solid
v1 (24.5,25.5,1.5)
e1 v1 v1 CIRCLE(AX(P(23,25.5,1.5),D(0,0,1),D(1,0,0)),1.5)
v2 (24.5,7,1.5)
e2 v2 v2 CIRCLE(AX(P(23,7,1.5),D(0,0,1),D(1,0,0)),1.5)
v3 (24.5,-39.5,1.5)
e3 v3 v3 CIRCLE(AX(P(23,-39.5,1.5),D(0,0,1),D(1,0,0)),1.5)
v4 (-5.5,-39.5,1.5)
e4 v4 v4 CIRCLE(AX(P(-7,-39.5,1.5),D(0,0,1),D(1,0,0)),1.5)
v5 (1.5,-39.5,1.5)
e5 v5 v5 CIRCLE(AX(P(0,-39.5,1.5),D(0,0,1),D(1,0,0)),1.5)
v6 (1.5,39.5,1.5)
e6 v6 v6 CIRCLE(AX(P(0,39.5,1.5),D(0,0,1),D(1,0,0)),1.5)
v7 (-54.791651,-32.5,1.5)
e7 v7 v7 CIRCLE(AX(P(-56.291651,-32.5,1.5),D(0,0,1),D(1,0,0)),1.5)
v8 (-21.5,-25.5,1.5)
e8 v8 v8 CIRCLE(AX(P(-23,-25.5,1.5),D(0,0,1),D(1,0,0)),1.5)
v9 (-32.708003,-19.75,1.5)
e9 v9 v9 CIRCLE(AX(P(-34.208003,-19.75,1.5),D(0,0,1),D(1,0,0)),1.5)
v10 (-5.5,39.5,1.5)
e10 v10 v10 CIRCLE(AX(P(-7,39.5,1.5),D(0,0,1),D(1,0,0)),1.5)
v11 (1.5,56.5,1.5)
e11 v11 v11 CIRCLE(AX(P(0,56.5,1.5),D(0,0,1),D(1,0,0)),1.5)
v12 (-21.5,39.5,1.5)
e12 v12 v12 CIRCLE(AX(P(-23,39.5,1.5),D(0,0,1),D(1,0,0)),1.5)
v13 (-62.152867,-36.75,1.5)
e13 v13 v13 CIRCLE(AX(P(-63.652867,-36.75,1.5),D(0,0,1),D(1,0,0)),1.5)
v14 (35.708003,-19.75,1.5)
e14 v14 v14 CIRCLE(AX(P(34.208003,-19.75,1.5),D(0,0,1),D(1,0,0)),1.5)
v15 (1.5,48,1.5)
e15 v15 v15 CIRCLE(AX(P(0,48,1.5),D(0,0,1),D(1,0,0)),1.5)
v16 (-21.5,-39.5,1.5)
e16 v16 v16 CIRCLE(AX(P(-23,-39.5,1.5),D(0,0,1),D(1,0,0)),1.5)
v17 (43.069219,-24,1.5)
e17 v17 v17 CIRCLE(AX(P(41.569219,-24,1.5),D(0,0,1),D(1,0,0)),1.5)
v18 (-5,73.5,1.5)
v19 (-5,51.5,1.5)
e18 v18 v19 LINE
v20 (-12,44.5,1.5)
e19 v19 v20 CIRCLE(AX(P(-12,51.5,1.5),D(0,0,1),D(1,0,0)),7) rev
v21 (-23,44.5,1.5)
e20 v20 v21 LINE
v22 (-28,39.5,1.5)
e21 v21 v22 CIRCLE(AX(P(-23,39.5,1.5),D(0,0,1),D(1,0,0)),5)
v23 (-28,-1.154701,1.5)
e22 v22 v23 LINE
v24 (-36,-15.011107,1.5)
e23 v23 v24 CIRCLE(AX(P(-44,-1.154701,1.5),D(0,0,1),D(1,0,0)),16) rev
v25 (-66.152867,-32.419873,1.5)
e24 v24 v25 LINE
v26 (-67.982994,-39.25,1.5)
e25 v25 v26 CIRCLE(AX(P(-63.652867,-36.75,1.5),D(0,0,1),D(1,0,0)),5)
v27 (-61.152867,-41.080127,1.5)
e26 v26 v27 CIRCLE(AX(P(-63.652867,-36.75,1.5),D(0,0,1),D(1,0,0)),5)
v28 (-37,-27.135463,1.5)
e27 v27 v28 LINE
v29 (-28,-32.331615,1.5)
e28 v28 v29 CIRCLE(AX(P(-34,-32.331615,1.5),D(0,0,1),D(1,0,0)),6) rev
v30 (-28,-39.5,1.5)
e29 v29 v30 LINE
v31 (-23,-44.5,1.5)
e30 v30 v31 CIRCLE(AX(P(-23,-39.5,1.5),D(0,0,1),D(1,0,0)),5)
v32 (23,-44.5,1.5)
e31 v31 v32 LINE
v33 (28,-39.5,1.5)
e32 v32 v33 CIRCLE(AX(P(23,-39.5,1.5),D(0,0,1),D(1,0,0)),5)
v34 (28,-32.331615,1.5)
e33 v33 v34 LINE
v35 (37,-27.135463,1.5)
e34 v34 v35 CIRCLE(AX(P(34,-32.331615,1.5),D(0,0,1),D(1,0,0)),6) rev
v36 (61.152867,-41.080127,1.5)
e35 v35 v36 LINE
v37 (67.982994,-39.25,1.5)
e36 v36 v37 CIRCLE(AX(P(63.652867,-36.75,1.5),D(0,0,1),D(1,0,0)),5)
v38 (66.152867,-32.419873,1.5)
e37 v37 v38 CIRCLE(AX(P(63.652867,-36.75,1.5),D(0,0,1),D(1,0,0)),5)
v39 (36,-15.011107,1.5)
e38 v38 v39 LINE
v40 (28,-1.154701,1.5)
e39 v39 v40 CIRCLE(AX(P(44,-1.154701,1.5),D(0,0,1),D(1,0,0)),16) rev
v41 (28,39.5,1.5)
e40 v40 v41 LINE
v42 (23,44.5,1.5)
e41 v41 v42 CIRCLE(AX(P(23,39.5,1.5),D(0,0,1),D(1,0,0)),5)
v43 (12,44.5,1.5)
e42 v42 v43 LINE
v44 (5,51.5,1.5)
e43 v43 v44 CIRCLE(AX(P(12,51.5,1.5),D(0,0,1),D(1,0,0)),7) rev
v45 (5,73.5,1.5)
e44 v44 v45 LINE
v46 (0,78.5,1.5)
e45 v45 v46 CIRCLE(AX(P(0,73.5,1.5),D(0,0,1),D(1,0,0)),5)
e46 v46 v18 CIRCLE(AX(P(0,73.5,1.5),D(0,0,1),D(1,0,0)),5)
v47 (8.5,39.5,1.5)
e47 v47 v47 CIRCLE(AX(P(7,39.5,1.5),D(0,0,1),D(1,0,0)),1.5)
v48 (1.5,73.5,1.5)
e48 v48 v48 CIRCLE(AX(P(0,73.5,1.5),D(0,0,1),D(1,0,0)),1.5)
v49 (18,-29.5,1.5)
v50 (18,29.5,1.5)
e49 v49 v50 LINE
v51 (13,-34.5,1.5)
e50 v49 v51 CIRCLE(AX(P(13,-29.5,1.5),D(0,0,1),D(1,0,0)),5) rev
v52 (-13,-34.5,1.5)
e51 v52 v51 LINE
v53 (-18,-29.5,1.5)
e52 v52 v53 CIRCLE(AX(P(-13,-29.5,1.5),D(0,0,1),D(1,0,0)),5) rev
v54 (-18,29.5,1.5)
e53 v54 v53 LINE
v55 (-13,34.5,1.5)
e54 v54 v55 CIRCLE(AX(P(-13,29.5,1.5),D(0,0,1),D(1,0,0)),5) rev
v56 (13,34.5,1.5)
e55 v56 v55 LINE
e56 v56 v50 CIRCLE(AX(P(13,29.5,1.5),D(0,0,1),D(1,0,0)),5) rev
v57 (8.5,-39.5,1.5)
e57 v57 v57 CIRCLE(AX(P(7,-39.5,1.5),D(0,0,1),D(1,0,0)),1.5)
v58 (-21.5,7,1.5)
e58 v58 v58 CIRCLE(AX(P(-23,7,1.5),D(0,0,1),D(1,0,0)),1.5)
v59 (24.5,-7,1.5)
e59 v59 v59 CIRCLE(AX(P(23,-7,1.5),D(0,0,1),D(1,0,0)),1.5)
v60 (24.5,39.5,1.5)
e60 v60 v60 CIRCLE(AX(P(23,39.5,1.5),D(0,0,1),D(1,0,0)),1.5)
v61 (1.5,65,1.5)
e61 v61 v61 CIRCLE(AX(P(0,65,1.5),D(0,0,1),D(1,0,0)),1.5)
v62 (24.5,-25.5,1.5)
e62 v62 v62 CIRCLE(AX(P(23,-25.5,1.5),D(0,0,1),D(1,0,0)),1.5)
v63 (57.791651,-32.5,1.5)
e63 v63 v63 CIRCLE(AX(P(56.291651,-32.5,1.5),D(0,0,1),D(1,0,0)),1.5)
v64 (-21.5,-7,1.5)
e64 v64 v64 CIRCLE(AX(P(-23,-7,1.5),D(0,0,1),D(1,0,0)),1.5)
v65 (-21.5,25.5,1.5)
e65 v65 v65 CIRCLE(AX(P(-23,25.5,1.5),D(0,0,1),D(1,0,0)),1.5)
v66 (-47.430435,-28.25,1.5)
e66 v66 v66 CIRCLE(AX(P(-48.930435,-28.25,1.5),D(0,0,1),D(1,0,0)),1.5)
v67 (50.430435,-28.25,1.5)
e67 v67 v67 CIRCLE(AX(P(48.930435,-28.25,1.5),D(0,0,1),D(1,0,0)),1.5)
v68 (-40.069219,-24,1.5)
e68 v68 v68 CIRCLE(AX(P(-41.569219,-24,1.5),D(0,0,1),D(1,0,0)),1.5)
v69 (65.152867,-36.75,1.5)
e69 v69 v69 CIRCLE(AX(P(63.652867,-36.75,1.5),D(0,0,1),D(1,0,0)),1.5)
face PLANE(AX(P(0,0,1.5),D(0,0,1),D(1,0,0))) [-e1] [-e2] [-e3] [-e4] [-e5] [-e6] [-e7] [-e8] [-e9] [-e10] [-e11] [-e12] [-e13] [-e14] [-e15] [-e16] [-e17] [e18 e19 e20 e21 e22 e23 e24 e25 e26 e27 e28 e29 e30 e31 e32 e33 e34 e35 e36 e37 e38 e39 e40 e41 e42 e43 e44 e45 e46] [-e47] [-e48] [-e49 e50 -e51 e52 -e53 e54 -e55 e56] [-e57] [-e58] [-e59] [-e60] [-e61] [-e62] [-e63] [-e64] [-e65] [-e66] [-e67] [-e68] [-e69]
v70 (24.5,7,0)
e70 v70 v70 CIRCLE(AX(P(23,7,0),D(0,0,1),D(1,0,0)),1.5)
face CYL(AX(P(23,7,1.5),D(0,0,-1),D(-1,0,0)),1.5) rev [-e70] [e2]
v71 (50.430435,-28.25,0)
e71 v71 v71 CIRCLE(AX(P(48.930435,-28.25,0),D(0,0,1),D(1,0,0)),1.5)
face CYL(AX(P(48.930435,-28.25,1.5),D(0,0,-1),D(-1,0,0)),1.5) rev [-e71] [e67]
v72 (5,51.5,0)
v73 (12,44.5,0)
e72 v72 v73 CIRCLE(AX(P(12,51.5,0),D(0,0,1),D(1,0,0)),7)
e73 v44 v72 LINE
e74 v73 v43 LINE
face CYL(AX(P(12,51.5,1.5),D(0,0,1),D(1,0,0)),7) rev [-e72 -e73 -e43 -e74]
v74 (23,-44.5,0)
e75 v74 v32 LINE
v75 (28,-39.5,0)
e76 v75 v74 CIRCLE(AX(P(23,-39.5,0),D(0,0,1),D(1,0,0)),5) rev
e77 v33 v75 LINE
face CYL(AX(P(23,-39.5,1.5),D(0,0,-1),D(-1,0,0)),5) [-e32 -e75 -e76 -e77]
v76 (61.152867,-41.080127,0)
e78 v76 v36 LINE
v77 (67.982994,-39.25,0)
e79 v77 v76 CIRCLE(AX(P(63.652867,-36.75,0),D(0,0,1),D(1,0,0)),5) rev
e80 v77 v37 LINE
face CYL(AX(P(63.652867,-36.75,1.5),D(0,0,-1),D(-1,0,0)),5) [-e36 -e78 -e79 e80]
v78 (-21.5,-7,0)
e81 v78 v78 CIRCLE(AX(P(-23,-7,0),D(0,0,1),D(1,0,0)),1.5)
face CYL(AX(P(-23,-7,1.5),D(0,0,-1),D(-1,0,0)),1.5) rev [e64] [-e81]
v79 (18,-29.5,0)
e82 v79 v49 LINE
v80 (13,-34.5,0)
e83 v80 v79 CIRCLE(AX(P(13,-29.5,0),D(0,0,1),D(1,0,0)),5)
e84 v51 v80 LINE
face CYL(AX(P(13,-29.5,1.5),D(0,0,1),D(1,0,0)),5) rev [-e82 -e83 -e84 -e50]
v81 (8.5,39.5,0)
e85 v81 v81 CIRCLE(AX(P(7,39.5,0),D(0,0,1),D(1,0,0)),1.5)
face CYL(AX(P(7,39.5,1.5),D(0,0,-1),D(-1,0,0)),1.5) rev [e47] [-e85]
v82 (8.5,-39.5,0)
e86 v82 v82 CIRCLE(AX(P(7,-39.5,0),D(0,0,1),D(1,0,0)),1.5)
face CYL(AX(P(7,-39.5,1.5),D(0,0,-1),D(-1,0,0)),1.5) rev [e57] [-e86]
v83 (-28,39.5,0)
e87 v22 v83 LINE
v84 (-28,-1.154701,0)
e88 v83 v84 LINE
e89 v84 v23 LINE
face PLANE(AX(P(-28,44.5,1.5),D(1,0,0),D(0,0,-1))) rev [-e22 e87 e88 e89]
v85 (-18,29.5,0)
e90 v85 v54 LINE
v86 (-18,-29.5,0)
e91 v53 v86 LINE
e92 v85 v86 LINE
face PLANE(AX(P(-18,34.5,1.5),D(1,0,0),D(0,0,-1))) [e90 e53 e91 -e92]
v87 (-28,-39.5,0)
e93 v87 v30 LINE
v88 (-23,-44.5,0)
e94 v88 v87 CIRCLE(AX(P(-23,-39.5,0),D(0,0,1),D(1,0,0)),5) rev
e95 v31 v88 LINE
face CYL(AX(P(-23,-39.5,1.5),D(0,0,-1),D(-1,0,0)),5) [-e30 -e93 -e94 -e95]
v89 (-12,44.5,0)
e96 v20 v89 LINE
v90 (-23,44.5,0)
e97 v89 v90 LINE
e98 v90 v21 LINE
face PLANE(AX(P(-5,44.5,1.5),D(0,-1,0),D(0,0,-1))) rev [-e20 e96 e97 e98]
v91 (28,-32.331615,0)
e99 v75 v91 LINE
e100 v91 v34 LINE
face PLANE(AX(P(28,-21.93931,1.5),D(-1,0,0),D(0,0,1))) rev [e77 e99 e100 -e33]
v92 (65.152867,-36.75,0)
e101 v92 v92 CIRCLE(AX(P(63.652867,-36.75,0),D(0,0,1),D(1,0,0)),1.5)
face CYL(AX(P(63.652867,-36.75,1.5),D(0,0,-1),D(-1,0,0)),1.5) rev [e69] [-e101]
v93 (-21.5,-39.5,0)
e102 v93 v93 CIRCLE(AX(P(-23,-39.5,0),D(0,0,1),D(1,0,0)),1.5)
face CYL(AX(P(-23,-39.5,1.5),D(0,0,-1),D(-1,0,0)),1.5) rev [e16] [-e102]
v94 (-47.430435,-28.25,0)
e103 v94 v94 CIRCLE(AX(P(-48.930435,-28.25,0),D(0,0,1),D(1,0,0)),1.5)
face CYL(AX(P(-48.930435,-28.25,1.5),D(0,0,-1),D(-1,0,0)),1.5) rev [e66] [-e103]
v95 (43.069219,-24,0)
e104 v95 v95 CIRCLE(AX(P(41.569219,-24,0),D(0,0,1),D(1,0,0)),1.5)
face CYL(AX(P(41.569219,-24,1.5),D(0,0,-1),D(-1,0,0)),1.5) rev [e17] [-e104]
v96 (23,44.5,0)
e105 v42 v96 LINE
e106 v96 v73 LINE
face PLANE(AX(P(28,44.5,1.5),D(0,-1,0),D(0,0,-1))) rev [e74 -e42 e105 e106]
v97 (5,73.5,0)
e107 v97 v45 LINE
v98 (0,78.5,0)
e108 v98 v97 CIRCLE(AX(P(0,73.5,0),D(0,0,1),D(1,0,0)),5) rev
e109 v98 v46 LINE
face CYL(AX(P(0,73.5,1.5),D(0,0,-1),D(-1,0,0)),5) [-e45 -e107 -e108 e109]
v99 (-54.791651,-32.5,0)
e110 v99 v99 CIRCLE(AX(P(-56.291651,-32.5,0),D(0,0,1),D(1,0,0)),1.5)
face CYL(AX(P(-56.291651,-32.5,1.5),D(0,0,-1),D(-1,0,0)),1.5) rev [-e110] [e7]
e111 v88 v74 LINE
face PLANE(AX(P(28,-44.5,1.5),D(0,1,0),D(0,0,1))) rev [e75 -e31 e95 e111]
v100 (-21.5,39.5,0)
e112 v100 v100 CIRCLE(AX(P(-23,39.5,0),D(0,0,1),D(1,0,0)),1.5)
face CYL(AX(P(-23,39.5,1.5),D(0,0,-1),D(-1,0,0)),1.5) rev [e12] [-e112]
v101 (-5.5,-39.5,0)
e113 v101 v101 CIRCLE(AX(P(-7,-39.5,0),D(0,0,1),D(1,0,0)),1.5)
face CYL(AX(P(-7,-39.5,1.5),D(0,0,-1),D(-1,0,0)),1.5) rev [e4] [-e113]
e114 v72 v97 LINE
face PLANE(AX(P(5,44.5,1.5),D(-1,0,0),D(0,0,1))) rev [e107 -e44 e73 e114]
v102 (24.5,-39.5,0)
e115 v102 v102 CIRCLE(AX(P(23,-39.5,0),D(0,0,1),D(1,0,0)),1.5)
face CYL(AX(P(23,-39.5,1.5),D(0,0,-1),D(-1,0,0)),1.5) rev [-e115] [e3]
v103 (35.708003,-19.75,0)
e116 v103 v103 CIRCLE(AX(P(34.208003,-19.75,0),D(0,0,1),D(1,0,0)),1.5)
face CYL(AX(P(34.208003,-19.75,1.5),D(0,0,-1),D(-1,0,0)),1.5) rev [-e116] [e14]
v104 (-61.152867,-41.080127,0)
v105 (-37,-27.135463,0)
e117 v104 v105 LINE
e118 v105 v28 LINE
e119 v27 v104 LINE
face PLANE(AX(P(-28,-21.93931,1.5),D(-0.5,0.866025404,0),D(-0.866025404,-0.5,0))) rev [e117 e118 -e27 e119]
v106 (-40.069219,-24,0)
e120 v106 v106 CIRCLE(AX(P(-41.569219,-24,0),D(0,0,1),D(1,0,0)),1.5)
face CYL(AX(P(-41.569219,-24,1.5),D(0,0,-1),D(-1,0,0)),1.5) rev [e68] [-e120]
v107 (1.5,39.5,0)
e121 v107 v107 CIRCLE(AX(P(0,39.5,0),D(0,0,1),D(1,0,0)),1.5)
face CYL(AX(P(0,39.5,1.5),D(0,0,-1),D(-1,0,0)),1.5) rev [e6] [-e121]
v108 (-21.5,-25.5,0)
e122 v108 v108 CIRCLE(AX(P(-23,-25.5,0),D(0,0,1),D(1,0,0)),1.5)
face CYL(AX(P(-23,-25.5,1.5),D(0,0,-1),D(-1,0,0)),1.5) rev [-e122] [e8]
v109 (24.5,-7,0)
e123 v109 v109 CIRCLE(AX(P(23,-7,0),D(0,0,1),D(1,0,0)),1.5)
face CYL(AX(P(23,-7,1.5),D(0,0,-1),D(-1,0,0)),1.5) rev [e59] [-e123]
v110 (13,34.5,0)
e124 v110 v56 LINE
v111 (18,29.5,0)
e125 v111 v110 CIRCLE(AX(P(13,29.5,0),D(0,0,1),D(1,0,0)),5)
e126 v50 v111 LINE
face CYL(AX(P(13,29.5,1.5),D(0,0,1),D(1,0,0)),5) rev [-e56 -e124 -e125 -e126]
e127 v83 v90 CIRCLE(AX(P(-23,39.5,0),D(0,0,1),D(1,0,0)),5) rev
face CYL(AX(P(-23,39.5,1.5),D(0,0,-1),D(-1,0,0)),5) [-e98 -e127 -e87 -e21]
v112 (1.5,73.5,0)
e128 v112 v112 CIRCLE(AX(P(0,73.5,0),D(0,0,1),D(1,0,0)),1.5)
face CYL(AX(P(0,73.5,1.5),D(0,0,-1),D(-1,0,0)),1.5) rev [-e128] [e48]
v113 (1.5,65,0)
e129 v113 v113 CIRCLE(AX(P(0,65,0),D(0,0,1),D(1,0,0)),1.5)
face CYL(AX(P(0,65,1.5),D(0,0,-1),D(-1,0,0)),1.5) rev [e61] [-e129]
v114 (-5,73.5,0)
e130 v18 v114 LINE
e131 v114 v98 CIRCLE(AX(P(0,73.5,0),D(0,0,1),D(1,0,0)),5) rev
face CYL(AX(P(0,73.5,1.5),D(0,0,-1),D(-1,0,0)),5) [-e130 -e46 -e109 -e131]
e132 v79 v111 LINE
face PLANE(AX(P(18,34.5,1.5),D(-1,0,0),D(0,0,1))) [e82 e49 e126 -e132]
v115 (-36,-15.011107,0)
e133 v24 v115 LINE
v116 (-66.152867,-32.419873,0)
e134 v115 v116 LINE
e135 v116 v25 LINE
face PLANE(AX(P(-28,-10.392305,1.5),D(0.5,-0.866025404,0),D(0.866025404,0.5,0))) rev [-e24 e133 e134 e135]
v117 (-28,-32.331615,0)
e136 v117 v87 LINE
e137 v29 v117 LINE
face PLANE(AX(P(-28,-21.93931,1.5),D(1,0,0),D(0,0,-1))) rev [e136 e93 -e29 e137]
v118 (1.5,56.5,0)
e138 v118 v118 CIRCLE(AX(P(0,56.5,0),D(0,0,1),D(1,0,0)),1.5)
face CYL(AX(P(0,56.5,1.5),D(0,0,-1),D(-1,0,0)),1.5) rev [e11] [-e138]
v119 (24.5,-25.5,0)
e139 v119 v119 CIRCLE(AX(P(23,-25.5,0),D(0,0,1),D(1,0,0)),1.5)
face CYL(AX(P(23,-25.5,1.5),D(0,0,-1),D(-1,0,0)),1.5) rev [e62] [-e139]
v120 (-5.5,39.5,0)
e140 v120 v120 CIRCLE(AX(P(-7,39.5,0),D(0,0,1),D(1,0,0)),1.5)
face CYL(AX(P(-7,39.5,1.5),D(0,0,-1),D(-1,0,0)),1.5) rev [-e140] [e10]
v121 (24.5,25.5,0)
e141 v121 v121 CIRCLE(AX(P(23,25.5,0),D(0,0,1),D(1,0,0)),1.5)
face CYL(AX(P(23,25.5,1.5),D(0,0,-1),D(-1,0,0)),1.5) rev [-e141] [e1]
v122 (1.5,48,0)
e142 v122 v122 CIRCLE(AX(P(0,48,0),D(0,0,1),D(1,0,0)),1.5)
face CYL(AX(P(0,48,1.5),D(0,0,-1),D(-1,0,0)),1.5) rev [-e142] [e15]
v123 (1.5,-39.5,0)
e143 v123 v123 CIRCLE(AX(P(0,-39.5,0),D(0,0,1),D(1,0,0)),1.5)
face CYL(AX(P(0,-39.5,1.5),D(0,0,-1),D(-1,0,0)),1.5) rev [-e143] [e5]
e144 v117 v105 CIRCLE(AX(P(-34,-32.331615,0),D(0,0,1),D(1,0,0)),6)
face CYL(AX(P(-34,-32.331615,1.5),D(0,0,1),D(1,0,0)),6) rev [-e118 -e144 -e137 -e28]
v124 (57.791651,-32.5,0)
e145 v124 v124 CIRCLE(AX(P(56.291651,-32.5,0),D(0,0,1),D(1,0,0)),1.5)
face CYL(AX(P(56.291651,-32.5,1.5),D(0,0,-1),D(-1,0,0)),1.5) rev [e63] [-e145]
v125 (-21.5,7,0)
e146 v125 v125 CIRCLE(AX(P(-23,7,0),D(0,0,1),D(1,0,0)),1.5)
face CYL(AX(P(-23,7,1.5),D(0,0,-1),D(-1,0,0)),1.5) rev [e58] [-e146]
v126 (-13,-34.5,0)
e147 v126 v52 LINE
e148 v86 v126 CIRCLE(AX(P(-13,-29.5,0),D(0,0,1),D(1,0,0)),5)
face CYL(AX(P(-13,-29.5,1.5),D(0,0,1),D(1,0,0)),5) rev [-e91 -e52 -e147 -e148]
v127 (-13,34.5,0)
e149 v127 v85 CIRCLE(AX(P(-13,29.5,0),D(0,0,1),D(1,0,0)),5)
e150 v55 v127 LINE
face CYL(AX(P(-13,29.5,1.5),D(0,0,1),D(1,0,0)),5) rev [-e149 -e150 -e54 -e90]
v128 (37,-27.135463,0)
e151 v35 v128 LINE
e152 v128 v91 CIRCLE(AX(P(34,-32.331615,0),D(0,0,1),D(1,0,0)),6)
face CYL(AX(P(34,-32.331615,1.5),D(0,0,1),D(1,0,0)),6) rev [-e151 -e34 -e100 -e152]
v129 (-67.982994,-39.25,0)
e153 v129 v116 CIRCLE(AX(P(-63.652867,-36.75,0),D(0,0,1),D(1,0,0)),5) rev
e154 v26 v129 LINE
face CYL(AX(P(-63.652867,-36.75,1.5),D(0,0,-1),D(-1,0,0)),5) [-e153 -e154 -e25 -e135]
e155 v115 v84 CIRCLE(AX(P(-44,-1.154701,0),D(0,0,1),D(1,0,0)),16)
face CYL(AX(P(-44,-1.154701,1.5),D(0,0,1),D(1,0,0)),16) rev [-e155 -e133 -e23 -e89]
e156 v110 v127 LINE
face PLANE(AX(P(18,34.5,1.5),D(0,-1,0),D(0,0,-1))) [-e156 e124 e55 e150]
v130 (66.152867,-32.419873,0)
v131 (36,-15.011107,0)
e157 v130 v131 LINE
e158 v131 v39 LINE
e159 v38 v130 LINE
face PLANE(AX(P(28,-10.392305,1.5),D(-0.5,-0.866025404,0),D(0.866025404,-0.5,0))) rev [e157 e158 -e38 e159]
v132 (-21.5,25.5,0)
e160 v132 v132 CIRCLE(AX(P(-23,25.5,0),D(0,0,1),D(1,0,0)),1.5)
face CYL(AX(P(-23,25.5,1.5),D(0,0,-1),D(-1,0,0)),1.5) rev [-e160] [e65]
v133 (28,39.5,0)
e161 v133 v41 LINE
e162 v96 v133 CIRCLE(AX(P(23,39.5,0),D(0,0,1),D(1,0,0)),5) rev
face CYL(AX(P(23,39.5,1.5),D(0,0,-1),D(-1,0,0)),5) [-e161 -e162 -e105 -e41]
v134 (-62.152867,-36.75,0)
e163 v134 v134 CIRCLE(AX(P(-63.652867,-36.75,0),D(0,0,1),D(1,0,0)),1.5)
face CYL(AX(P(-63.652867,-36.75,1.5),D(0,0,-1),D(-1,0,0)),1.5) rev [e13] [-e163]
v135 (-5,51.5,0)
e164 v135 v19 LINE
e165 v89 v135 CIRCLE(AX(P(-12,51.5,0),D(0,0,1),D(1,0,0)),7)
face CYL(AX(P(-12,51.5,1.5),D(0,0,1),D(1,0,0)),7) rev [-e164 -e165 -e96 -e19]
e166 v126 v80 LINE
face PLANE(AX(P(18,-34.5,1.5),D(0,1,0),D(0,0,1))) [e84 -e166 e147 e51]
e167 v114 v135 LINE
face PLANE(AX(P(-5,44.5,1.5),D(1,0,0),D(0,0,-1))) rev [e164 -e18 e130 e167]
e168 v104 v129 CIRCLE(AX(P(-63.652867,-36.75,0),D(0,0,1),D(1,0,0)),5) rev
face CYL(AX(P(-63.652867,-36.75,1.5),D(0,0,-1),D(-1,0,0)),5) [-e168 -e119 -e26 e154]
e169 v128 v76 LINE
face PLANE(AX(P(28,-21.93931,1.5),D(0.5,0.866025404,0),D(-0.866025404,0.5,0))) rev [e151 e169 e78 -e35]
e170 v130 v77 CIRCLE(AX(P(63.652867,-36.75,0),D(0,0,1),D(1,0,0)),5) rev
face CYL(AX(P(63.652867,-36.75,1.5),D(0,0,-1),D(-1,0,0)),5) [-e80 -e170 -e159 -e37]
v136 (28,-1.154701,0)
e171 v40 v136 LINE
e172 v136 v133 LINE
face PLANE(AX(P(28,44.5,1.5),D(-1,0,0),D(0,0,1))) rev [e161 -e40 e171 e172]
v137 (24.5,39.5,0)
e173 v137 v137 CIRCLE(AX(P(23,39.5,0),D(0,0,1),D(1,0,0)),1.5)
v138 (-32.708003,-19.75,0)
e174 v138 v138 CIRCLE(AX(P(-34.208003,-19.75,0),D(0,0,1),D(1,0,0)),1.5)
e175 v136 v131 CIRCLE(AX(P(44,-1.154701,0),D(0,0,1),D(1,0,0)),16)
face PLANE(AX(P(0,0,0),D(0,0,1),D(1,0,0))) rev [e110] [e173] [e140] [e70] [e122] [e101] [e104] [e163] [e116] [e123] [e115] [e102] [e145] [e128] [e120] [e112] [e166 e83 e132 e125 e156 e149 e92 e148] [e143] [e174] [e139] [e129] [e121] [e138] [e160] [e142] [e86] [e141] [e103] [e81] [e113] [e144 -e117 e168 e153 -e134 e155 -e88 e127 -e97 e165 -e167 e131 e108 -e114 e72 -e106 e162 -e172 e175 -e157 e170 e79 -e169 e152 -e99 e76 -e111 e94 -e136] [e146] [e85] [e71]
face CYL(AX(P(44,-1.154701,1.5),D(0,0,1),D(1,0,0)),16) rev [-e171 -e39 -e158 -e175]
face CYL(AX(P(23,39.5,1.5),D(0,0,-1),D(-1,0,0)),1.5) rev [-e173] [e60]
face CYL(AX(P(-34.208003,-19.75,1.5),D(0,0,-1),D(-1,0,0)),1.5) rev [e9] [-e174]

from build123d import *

# Parameters (mm, degrees)
SKETCH_1_R      = 1.5
SKETCH_1_W      = 36
SKETCH_1_H      = 69
EXTRUDE_1_DEPTH = 1.5
FILLET_1_R      = 5
FILLET_2_R      = 6
FILLET_3_R      = 16
FILLET_4_R      = 7
FILLET_5_R      = 5


with BuildPart() as part:
    # 草图1 → 凸台-拉伸1 (new body)
    with BuildSketch(Plane.XY):
        Polygon((28, 44.5), (5, 44.5), (5, 78.5), (-5, 78.5), (-5, 44.5), (-28, 44.5), (-28, -10.392304845), (-70.482994197, -34.919872981), (-65.482994197, -43.580127019), (-28, -21.939310229), (-28, -44.5), (28, -44.5), (28, -21.939310229), (65.482994197, -43.580127019), (70.482994197, -34.919872981), (28, -10.392304845), align=None)
        with Locations((23, -39.5)):
            Circle(SKETCH_1_R, mode=Mode.SUBTRACT)
        with Locations((-23, -39.5)):
            Circle(SKETCH_1_R, mode=Mode.SUBTRACT)
        with Locations((-23, 39.5)):
            Circle(SKETCH_1_R, mode=Mode.SUBTRACT)
        with Locations((23, 39.5)):
            Circle(SKETCH_1_R, mode=Mode.SUBTRACT)
        with Locations((-23, 25.5)):
            Circle(SKETCH_1_R, mode=Mode.SUBTRACT)
        with Locations((23, 25.5)):
            Circle(SKETCH_1_R, mode=Mode.SUBTRACT)
        with Locations((23, -25.5)):
            Circle(SKETCH_1_R, mode=Mode.SUBTRACT)
        with Locations((-23, -25.5)):
            Circle(SKETCH_1_R, mode=Mode.SUBTRACT)
        with Locations((0, 39.5)):
            Circle(SKETCH_1_R, mode=Mode.SUBTRACT)
        with Locations((0, 73.5)):
            Circle(SKETCH_1_R, mode=Mode.SUBTRACT)
        with Locations((-63.652867178, -36.75)):
            Circle(SKETCH_1_R, mode=Mode.SUBTRACT)
        with Locations((-34.208003449, -19.75)):
            Circle(SKETCH_1_R, mode=Mode.SUBTRACT)
        with Locations((63.652867178, -36.75)):
            Circle(SKETCH_1_R, mode=Mode.SUBTRACT)
        with Locations((34.208003449, -19.75)):
            Circle(SKETCH_1_R, mode=Mode.SUBTRACT)
        with Locations((0, -39.5)):
            Circle(SKETCH_1_R, mode=Mode.SUBTRACT)
        with Locations((7, -39.5)):
            Circle(SKETCH_1_R, mode=Mode.SUBTRACT)
        with Locations((-7, -39.5)):
            Circle(SKETCH_1_R, mode=Mode.SUBTRACT)
        with Locations((7, 39.5)):
            Circle(SKETCH_1_R, mode=Mode.SUBTRACT)
        with Locations((-7, 39.5)):
            Circle(SKETCH_1_R, mode=Mode.SUBTRACT)
        with Locations((-23, 7)):
            Circle(SKETCH_1_R, mode=Mode.SUBTRACT)
        with Locations((-23, -7)):
            Circle(SKETCH_1_R, mode=Mode.SUBTRACT)
        with Locations((23, 7)):
            Circle(SKETCH_1_R, mode=Mode.SUBTRACT)
        with Locations((23, -7)):
            Circle(SKETCH_1_R, mode=Mode.SUBTRACT)
        with Locations((0, 65)):
            Circle(SKETCH_1_R, mode=Mode.SUBTRACT)
        with Locations((0, 56.5)):
            Circle(SKETCH_1_R, mode=Mode.SUBTRACT)
        with Locations((0, 48)):
            Circle(SKETCH_1_R, mode=Mode.SUBTRACT)
        with Locations((56.291651246, -32.5)):
            Circle(SKETCH_1_R, mode=Mode.SUBTRACT)
        with Locations((48.930435314, -28.25)):
            Circle(SKETCH_1_R, mode=Mode.SUBTRACT)
        with Locations((41.569219382, -24)):
            Circle(SKETCH_1_R, mode=Mode.SUBTRACT)
        with Locations((-56.291651246, -32.5)):
            Circle(SKETCH_1_R, mode=Mode.SUBTRACT)
        with Locations((-48.930435314, -28.25)):
            Circle(SKETCH_1_R, mode=Mode.SUBTRACT)
        with Locations((-41.569219382, -24)):
            Circle(SKETCH_1_R, mode=Mode.SUBTRACT)
        Rectangle(SKETCH_1_W, SKETCH_1_H, mode=Mode.SUBTRACT)
    extrude(amount=EXTRUDE_1_DEPTH)

    # 圆角1
    fillet_1_edges = [part.edges().sort_by_distance(p)[0] for p in [
        (28, 44.5, 0.75),
        (28, -44.5, 0.75),
        (-28, -44.5, 0.75),
        (-28, 44.5, 0.75),
        (-18, 34.5, 0.75),
        (-18, -34.5, 0.75),
        (18, -34.5, 0.75),
        (18, 34.5, 0.75),
    ]]
    fillet(fillet_1_edges, radius=FILLET_1_R)

    # 圆角2
    fillet_2_edges = [part.edges().sort_by_distance(p)[0] for p in [
        (28, -21.939310229, 0.75),
        (-28, -21.939310229, 0.75),
    ]]
    fillet(fillet_2_edges, radius=FILLET_2_R)

    # 圆角3
    fillet_3_edges = [part.edges().sort_by_distance(p)[0] for p in [
        (28, -10.392304845, 0.75),
        (-28, -10.392304845, 0.75),
    ]]
    fillet(fillet_3_edges, radius=FILLET_3_R)

    # 圆角4
    fillet_4_edges = [part.edges().sort_by_distance(p)[0] for p in [
        (-5, 44.5, 0.75),
        (5, 44.5, 0.75),
    ]]
    fillet(fillet_4_edges, radius=FILLET_4_R)

    # 圆角5
    fillet_5_edges = [part.edges().sort_by_distance(p)[0] for p in [
        (5, 78.5, 0.75),
        (-5, 78.5, 0.75),
        (65.482994197, -43.580127019, 0.75),
        (70.482994197, -34.919872981, 0.75),
        (-65.482994197, -43.580127019, 0.75),
        (-70.482994197, -34.919872981, 0.75),
    ]]
    fillet(fillet_5_edges, radius=FILLET_5_R - 0.0001)  # a hair under: the kernel refuses the full size


solid = part.part
